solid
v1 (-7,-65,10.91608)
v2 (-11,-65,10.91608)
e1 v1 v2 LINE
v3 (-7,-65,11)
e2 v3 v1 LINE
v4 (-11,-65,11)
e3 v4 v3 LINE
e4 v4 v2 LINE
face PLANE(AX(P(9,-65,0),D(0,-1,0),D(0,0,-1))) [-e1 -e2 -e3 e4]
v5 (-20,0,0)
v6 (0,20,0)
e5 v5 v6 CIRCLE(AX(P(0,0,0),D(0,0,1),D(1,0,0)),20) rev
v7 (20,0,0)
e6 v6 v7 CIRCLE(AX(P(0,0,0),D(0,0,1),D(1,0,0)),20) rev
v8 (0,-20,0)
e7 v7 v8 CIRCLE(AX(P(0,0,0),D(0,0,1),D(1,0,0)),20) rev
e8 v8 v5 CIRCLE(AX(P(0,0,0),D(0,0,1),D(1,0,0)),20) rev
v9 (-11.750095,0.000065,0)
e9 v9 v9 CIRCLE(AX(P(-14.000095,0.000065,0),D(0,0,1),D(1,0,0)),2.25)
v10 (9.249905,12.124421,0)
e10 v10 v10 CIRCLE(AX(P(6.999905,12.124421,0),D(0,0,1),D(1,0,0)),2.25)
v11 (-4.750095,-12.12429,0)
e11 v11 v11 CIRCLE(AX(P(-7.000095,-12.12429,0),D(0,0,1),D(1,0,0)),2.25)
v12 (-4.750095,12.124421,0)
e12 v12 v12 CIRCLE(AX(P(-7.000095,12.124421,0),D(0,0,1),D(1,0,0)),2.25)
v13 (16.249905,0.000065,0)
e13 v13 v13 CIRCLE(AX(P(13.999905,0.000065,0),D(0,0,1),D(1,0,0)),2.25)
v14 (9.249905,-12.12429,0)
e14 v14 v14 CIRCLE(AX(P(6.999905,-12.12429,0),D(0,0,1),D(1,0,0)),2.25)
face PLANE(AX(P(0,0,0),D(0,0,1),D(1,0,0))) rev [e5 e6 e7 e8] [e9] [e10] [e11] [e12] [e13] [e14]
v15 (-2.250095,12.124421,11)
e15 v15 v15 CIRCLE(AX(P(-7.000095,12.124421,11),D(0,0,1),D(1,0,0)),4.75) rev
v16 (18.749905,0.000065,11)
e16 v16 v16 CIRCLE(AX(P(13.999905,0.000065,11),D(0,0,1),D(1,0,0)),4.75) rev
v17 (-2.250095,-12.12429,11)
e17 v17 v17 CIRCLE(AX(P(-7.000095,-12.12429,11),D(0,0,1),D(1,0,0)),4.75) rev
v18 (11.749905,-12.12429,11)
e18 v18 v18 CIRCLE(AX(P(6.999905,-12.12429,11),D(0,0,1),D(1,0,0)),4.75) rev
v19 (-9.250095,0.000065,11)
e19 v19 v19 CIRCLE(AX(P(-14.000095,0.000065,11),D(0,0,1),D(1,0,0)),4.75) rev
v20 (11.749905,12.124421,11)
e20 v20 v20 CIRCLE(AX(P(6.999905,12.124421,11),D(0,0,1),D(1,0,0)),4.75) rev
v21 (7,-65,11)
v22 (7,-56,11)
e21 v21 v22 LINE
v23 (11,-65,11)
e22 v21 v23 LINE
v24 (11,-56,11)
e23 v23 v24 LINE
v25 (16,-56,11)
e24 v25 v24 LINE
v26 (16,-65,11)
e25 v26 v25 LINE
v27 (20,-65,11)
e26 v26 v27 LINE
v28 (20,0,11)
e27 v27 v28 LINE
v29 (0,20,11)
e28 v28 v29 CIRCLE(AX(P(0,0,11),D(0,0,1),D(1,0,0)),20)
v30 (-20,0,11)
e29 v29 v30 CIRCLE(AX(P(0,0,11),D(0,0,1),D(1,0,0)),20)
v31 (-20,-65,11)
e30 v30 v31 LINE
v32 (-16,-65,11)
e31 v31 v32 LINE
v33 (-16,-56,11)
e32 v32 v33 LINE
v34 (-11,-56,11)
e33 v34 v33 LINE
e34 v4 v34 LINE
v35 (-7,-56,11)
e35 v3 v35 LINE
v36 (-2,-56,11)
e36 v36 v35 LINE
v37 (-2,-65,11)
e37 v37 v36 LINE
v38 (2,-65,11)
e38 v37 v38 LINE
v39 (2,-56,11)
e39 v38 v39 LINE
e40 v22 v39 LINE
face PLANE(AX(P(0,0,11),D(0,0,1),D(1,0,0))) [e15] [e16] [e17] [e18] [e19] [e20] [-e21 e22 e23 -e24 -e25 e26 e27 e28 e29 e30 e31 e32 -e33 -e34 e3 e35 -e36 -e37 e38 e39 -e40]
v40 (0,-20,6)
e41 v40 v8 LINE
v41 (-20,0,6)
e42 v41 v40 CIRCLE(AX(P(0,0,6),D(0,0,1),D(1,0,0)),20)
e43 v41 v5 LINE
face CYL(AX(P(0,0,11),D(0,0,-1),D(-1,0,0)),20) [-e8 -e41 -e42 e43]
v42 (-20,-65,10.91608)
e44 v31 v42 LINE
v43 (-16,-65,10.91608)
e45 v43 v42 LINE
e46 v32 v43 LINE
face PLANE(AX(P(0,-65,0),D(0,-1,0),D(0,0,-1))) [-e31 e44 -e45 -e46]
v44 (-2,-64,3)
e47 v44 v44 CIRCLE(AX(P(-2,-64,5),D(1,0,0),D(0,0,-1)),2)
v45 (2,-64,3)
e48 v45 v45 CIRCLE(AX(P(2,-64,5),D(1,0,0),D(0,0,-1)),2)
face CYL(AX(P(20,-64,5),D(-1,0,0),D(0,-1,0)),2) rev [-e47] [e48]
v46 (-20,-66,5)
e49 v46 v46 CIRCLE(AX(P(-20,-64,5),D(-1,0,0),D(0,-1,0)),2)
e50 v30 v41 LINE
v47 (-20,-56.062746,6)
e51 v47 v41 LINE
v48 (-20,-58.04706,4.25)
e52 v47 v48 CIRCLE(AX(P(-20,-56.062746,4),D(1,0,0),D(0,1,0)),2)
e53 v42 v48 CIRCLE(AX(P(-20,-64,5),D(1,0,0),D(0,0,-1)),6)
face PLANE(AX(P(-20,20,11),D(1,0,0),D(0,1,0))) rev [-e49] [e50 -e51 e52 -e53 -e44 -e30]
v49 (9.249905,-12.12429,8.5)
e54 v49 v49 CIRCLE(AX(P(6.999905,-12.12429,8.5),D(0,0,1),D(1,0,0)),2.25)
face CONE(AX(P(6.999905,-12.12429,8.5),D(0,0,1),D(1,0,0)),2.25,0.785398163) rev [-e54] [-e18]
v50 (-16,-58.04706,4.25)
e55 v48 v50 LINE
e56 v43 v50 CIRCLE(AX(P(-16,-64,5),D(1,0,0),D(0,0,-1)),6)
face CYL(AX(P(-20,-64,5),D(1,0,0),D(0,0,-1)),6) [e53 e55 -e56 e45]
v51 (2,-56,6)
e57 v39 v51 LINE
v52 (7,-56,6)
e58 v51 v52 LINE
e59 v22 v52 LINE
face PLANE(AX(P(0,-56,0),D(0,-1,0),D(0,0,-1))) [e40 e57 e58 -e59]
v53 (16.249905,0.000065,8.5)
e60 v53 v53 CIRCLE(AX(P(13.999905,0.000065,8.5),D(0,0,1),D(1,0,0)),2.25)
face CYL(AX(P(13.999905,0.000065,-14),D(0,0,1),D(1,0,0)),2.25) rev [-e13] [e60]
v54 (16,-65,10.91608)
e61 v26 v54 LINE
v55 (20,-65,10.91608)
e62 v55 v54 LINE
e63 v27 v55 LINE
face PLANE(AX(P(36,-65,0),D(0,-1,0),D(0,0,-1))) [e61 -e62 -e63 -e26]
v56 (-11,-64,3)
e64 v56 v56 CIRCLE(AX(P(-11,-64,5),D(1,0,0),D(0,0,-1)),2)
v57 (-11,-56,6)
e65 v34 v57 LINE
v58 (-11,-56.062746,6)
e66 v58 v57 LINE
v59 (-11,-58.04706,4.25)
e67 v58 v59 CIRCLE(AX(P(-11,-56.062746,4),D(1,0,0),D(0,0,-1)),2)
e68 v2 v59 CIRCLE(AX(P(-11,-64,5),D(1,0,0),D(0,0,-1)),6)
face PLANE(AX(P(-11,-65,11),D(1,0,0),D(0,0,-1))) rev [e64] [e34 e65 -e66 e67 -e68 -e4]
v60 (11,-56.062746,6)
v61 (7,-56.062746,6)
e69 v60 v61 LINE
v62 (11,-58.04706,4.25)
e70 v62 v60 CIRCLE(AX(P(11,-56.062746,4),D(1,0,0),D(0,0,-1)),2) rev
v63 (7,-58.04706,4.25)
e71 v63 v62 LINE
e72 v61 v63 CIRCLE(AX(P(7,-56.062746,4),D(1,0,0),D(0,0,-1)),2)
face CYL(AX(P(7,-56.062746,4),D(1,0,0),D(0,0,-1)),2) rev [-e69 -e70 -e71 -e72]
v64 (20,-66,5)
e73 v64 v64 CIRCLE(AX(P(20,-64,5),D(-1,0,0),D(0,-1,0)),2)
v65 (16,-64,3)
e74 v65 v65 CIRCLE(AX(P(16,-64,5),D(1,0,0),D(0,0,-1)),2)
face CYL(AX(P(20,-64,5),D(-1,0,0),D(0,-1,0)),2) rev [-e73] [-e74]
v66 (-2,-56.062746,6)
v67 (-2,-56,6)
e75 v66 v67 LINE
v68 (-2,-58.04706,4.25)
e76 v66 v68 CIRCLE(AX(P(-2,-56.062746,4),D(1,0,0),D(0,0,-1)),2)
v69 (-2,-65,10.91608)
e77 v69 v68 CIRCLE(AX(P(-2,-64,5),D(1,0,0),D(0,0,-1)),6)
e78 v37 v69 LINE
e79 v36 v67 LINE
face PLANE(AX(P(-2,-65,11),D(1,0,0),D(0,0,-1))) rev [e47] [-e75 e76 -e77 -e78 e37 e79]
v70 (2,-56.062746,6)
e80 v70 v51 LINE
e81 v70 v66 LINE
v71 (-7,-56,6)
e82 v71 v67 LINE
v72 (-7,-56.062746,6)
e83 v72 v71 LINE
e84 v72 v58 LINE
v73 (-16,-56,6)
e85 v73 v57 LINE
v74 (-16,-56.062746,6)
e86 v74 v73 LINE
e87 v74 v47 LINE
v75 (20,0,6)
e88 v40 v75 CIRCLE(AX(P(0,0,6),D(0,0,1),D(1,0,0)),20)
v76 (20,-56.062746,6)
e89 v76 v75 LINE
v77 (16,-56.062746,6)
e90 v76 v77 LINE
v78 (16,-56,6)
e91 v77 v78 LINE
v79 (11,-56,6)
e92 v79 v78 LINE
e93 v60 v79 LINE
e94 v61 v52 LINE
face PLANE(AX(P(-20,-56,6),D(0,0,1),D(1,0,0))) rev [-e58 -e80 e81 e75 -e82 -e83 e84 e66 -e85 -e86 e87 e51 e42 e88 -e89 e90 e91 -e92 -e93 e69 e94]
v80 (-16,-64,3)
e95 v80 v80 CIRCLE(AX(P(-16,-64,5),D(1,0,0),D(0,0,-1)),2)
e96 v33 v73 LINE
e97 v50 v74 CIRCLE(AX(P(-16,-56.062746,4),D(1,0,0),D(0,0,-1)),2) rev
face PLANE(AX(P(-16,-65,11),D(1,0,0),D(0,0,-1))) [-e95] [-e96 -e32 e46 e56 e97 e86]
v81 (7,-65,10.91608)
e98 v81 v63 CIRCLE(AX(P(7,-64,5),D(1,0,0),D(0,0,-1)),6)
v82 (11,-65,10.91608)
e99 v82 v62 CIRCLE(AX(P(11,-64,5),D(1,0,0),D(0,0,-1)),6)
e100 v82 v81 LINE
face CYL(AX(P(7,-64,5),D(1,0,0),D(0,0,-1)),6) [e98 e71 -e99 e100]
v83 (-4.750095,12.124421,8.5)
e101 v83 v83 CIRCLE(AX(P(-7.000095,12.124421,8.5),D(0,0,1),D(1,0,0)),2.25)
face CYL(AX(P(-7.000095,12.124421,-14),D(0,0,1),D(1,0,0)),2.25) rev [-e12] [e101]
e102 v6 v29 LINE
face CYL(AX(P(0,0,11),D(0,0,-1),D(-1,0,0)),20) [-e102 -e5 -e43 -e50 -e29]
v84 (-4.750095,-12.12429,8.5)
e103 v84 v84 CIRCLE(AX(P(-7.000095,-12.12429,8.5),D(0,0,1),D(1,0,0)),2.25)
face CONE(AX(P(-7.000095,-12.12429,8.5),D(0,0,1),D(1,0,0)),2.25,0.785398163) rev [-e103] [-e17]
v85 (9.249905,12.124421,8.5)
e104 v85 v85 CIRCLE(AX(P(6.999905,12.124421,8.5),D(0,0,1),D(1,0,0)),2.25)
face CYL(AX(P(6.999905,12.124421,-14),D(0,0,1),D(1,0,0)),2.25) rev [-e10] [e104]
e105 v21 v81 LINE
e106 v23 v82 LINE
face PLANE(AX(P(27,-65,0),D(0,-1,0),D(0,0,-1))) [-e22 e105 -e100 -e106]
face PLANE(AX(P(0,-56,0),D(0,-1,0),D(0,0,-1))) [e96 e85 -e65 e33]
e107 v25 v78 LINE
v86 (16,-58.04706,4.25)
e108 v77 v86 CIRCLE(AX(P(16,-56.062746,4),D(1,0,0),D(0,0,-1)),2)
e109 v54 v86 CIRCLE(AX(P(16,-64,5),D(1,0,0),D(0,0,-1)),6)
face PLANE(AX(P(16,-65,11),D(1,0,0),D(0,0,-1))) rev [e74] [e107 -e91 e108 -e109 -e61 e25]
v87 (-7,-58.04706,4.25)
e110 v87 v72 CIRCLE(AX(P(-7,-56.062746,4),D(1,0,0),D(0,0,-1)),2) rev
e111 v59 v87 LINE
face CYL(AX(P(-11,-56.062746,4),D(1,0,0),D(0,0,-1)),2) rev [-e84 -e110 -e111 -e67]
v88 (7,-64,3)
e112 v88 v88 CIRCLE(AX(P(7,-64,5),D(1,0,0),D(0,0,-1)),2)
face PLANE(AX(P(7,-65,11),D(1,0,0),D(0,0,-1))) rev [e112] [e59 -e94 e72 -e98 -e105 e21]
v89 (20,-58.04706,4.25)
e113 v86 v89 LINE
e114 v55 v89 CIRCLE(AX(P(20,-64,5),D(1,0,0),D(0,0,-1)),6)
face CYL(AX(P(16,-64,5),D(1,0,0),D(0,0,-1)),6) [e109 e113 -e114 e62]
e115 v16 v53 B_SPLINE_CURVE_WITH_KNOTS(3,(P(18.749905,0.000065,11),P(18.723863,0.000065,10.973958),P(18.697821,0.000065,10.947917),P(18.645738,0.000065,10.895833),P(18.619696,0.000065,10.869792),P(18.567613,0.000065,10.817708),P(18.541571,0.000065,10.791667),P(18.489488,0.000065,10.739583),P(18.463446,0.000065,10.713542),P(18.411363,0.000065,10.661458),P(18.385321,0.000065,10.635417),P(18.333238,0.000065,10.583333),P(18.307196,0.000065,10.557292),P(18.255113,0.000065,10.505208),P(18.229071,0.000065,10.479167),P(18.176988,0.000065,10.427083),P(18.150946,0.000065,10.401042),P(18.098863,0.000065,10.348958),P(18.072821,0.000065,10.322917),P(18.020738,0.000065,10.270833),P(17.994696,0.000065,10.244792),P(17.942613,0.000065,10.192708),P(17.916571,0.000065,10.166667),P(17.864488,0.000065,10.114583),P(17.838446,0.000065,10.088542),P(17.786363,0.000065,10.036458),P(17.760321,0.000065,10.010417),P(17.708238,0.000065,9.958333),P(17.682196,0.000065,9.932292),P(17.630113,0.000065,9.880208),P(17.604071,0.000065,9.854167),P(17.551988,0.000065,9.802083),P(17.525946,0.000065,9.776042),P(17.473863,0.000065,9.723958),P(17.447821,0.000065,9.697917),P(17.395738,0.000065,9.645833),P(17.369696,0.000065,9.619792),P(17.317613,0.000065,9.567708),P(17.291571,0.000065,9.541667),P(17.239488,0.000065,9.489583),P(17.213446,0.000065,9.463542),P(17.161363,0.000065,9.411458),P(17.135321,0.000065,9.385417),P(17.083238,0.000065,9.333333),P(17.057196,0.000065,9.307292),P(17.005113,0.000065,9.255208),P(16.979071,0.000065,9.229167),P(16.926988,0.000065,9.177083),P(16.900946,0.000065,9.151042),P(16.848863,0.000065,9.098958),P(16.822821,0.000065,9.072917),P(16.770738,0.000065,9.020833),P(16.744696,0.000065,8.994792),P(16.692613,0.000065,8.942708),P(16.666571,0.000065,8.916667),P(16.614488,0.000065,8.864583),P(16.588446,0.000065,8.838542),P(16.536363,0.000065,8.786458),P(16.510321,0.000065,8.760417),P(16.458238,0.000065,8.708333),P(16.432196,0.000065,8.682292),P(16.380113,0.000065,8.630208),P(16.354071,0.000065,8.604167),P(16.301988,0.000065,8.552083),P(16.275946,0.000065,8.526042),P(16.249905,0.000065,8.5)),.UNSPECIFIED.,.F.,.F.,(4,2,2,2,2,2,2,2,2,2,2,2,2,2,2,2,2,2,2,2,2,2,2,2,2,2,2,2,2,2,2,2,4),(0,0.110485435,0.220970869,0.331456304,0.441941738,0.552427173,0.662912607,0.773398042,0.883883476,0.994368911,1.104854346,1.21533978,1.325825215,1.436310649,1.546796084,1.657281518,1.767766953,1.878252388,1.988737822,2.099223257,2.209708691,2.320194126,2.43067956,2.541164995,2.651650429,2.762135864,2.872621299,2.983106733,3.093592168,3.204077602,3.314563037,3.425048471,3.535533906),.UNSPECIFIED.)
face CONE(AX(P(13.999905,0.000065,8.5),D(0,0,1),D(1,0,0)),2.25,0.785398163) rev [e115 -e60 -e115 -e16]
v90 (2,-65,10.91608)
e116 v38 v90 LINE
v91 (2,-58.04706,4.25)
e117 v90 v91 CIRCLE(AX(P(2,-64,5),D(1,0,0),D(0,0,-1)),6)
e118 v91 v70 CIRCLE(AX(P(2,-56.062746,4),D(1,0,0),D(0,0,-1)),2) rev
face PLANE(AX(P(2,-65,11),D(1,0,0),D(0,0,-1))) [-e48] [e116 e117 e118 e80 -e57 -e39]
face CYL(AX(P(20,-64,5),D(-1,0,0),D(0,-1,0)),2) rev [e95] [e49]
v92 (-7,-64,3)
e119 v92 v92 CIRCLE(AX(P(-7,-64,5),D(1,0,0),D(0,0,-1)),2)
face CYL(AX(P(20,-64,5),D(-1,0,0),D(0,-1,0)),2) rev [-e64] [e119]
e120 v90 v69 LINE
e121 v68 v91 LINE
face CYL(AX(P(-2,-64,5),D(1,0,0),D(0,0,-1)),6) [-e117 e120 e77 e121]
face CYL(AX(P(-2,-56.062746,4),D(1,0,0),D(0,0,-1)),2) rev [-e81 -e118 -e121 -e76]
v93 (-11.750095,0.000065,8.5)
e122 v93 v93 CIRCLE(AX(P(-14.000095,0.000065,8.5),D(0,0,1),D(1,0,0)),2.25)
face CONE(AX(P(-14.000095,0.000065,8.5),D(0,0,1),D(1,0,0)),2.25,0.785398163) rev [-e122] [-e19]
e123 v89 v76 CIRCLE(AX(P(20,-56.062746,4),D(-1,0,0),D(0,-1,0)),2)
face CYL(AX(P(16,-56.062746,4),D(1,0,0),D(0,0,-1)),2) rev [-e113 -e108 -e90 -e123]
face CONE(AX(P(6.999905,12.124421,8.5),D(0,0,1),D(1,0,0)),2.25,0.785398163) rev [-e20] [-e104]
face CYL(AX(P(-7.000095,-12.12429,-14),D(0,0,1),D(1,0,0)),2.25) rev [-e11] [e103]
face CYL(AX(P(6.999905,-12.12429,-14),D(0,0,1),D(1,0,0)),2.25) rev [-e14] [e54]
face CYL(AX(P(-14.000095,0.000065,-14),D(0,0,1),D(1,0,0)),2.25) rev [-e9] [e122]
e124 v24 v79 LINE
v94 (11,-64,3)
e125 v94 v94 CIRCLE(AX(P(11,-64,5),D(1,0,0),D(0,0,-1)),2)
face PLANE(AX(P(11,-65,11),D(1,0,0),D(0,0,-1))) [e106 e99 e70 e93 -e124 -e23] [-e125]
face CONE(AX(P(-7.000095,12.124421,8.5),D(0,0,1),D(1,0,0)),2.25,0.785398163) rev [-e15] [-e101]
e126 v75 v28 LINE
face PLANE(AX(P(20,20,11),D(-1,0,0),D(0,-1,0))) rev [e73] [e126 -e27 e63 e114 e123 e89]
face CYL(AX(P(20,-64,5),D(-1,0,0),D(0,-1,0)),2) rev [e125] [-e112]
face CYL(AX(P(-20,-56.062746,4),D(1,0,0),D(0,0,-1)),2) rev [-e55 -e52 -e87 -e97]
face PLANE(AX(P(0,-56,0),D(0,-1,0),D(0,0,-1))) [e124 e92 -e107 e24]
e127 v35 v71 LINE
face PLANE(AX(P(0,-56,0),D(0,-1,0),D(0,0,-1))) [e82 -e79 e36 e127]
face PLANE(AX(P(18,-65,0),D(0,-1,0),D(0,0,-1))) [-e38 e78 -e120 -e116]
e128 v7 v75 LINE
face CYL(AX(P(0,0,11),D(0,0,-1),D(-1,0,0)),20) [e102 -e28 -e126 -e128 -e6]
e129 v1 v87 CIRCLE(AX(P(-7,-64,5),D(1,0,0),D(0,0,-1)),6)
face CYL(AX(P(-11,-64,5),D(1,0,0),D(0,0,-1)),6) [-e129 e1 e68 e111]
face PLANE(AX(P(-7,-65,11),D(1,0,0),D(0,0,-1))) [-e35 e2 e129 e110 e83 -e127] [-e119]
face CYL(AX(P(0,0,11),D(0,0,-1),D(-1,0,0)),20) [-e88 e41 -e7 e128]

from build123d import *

# Parameters (mm, degrees)
SKETCH7_W           = 40
SKETCH7_H           = 40
BOSS_EXTRUDE1_DEPTH = 11
SKETCH8_W           = 40
SKETCH8_H           = 5
BOSS_EXTRUDE2_DEPTH = 36
SKETCH10_R          = 2.25
CUT_EXTRUDE1_DEPTH  = 25
FILLET1_R           = 20
SKETCH11_W          = 4
SKETCH11_H          = 5
BOSS_EXTRUDE3_DEPTH = 9
SKETCH14_R          = 6
BOSS_EXTRUDE4_DEPTH = 4
LPATTERN1_COUNT     = 5
LPATTERN1_PITCH     = 9
SKETCH15_R          = 2
CUT_EXTRUDE2_DEPTH  = 82.369527466
CHAMFER1_SIZE       = 2.5
FILLET2_R           = 2


with BuildPart() as part:
    # Sketch7 → Boss-Extrude1 (new body)
    with BuildSketch(Plane.XY):
        Rectangle(SKETCH7_W, SKETCH7_H)
    extrude(amount=BOSS_EXTRUDE1_DEPTH)

    # Sketch8 → Boss-Extrude2 (add)
    with BuildSketch(Plane.XZ.offset(20)):
        with Locations((0, 8.5)):
            Rectangle(SKETCH8_W, SKETCH8_H)
    extrude(amount=BOSS_EXTRUDE2_DEPTH)

    # Sketch10 → Cut-Extrude1 (cut)
    with BuildSketch(Plane.XY.offset(11)):
        with Locations((-7.00009521, 12.124420806)):
            Circle(SKETCH10_R)
        with Locations((6.99990479, 12.124420806)):
            Circle(SKETCH10_R)
        with Locations((13.99990479, 6.5153e-05)):
            Circle(SKETCH10_R)
        with Locations((6.99990479, -12.1242905)):
            Circle(SKETCH10_R)
        with Locations((-7.00009521, -12.1242905)):
            Circle(SKETCH10_R)
        with Locations((-14.00009521, 6.5153e-05)):
            Circle(SKETCH10_R)
    extrude(amount=-CUT_EXTRUDE1_DEPTH, mode=Mode.SUBTRACT)

    # Fillet1
    fillet1_edges = [part.edges().sort_by_distance(p)[0] for p in [
        (20, -20, 3),
        (20, 20, 5.5),
        (-20, 20, 5.5),
        (-20, -20, 3),
    ]]
    fillet(fillet1_edges, radius=FILLET1_R - 0.0001)  # a hair under: the kernel refuses the full size

    # Sketch11 → Boss-Extrude3 (add)
    with BuildSketch(Plane.XZ.offset(56)):
        with Locations((-18, 8.5)):
            Rectangle(SKETCH11_W, SKETCH11_H)
    boss_extrude3 = extrude(amount=BOSS_EXTRUDE3_DEPTH)

    # Sketch14 → Boss-Extrude4 (add)
    with BuildSketch(Plane(origin=(-16, 0, 0), x_dir=(0, 0, -1), z_dir=(1, 0, 0))):
        with Locations((-5, -64)):
            Circle(SKETCH14_R)
    boss_extrude4 = extrude(amount=-BOSS_EXTRUDE4_DEPTH)

    # LPattern1: Boss-Extrude3, Boss-Extrude4 ×5
    with Locations(*[(i * LPATTERN1_PITCH, 0, 0) for i in range(1, LPATTERN1_COUNT)]):
        add(boss_extrude3)
        add(boss_extrude4)

    # Sketch15 → Cut-Extrude2 (cut, through all)
    with BuildSketch(Plane.ZY.offset(20)):
        with Locations(Location((5, -64, 0), (0, 0, 270))):
            Circle(SKETCH15_R)
    extrude(amount=-CUT_EXTRUDE2_DEPTH, mode=Mode.SUBTRACT)

    # Chamfer1
    chamfer1_edges = [part.edges().sort_by_distance(p)[0] for p in [
        (-16.25009521, 6.5153e-05, 11),
        (-9.25009521, -12.1242905, 11),
        (4.74990479, -12.1242905, 11),
        (11.74990479, 6.5153e-05, 11),
        (4.74990479, 12.124420806, 11),
        (-9.25009521, 12.124420806, 11),
    ]]
    chamfer(chamfer1_edges, length=CHAMFER1_SIZE)

    # Fillet2
    fillet2_edges = [part.edges().sort_by_distance(p)[0] for p in [
        (-18, -58.083920217, 6),
        (-9, -58.083920217, 6),
        (0, -58.083920217, 6),
        (9, -58.083920217, 6),
        (18, -58.083920217, 6),
    ]]
    fillet(fillet2_edges, radius=FILLET2_R)


solid = part.part
